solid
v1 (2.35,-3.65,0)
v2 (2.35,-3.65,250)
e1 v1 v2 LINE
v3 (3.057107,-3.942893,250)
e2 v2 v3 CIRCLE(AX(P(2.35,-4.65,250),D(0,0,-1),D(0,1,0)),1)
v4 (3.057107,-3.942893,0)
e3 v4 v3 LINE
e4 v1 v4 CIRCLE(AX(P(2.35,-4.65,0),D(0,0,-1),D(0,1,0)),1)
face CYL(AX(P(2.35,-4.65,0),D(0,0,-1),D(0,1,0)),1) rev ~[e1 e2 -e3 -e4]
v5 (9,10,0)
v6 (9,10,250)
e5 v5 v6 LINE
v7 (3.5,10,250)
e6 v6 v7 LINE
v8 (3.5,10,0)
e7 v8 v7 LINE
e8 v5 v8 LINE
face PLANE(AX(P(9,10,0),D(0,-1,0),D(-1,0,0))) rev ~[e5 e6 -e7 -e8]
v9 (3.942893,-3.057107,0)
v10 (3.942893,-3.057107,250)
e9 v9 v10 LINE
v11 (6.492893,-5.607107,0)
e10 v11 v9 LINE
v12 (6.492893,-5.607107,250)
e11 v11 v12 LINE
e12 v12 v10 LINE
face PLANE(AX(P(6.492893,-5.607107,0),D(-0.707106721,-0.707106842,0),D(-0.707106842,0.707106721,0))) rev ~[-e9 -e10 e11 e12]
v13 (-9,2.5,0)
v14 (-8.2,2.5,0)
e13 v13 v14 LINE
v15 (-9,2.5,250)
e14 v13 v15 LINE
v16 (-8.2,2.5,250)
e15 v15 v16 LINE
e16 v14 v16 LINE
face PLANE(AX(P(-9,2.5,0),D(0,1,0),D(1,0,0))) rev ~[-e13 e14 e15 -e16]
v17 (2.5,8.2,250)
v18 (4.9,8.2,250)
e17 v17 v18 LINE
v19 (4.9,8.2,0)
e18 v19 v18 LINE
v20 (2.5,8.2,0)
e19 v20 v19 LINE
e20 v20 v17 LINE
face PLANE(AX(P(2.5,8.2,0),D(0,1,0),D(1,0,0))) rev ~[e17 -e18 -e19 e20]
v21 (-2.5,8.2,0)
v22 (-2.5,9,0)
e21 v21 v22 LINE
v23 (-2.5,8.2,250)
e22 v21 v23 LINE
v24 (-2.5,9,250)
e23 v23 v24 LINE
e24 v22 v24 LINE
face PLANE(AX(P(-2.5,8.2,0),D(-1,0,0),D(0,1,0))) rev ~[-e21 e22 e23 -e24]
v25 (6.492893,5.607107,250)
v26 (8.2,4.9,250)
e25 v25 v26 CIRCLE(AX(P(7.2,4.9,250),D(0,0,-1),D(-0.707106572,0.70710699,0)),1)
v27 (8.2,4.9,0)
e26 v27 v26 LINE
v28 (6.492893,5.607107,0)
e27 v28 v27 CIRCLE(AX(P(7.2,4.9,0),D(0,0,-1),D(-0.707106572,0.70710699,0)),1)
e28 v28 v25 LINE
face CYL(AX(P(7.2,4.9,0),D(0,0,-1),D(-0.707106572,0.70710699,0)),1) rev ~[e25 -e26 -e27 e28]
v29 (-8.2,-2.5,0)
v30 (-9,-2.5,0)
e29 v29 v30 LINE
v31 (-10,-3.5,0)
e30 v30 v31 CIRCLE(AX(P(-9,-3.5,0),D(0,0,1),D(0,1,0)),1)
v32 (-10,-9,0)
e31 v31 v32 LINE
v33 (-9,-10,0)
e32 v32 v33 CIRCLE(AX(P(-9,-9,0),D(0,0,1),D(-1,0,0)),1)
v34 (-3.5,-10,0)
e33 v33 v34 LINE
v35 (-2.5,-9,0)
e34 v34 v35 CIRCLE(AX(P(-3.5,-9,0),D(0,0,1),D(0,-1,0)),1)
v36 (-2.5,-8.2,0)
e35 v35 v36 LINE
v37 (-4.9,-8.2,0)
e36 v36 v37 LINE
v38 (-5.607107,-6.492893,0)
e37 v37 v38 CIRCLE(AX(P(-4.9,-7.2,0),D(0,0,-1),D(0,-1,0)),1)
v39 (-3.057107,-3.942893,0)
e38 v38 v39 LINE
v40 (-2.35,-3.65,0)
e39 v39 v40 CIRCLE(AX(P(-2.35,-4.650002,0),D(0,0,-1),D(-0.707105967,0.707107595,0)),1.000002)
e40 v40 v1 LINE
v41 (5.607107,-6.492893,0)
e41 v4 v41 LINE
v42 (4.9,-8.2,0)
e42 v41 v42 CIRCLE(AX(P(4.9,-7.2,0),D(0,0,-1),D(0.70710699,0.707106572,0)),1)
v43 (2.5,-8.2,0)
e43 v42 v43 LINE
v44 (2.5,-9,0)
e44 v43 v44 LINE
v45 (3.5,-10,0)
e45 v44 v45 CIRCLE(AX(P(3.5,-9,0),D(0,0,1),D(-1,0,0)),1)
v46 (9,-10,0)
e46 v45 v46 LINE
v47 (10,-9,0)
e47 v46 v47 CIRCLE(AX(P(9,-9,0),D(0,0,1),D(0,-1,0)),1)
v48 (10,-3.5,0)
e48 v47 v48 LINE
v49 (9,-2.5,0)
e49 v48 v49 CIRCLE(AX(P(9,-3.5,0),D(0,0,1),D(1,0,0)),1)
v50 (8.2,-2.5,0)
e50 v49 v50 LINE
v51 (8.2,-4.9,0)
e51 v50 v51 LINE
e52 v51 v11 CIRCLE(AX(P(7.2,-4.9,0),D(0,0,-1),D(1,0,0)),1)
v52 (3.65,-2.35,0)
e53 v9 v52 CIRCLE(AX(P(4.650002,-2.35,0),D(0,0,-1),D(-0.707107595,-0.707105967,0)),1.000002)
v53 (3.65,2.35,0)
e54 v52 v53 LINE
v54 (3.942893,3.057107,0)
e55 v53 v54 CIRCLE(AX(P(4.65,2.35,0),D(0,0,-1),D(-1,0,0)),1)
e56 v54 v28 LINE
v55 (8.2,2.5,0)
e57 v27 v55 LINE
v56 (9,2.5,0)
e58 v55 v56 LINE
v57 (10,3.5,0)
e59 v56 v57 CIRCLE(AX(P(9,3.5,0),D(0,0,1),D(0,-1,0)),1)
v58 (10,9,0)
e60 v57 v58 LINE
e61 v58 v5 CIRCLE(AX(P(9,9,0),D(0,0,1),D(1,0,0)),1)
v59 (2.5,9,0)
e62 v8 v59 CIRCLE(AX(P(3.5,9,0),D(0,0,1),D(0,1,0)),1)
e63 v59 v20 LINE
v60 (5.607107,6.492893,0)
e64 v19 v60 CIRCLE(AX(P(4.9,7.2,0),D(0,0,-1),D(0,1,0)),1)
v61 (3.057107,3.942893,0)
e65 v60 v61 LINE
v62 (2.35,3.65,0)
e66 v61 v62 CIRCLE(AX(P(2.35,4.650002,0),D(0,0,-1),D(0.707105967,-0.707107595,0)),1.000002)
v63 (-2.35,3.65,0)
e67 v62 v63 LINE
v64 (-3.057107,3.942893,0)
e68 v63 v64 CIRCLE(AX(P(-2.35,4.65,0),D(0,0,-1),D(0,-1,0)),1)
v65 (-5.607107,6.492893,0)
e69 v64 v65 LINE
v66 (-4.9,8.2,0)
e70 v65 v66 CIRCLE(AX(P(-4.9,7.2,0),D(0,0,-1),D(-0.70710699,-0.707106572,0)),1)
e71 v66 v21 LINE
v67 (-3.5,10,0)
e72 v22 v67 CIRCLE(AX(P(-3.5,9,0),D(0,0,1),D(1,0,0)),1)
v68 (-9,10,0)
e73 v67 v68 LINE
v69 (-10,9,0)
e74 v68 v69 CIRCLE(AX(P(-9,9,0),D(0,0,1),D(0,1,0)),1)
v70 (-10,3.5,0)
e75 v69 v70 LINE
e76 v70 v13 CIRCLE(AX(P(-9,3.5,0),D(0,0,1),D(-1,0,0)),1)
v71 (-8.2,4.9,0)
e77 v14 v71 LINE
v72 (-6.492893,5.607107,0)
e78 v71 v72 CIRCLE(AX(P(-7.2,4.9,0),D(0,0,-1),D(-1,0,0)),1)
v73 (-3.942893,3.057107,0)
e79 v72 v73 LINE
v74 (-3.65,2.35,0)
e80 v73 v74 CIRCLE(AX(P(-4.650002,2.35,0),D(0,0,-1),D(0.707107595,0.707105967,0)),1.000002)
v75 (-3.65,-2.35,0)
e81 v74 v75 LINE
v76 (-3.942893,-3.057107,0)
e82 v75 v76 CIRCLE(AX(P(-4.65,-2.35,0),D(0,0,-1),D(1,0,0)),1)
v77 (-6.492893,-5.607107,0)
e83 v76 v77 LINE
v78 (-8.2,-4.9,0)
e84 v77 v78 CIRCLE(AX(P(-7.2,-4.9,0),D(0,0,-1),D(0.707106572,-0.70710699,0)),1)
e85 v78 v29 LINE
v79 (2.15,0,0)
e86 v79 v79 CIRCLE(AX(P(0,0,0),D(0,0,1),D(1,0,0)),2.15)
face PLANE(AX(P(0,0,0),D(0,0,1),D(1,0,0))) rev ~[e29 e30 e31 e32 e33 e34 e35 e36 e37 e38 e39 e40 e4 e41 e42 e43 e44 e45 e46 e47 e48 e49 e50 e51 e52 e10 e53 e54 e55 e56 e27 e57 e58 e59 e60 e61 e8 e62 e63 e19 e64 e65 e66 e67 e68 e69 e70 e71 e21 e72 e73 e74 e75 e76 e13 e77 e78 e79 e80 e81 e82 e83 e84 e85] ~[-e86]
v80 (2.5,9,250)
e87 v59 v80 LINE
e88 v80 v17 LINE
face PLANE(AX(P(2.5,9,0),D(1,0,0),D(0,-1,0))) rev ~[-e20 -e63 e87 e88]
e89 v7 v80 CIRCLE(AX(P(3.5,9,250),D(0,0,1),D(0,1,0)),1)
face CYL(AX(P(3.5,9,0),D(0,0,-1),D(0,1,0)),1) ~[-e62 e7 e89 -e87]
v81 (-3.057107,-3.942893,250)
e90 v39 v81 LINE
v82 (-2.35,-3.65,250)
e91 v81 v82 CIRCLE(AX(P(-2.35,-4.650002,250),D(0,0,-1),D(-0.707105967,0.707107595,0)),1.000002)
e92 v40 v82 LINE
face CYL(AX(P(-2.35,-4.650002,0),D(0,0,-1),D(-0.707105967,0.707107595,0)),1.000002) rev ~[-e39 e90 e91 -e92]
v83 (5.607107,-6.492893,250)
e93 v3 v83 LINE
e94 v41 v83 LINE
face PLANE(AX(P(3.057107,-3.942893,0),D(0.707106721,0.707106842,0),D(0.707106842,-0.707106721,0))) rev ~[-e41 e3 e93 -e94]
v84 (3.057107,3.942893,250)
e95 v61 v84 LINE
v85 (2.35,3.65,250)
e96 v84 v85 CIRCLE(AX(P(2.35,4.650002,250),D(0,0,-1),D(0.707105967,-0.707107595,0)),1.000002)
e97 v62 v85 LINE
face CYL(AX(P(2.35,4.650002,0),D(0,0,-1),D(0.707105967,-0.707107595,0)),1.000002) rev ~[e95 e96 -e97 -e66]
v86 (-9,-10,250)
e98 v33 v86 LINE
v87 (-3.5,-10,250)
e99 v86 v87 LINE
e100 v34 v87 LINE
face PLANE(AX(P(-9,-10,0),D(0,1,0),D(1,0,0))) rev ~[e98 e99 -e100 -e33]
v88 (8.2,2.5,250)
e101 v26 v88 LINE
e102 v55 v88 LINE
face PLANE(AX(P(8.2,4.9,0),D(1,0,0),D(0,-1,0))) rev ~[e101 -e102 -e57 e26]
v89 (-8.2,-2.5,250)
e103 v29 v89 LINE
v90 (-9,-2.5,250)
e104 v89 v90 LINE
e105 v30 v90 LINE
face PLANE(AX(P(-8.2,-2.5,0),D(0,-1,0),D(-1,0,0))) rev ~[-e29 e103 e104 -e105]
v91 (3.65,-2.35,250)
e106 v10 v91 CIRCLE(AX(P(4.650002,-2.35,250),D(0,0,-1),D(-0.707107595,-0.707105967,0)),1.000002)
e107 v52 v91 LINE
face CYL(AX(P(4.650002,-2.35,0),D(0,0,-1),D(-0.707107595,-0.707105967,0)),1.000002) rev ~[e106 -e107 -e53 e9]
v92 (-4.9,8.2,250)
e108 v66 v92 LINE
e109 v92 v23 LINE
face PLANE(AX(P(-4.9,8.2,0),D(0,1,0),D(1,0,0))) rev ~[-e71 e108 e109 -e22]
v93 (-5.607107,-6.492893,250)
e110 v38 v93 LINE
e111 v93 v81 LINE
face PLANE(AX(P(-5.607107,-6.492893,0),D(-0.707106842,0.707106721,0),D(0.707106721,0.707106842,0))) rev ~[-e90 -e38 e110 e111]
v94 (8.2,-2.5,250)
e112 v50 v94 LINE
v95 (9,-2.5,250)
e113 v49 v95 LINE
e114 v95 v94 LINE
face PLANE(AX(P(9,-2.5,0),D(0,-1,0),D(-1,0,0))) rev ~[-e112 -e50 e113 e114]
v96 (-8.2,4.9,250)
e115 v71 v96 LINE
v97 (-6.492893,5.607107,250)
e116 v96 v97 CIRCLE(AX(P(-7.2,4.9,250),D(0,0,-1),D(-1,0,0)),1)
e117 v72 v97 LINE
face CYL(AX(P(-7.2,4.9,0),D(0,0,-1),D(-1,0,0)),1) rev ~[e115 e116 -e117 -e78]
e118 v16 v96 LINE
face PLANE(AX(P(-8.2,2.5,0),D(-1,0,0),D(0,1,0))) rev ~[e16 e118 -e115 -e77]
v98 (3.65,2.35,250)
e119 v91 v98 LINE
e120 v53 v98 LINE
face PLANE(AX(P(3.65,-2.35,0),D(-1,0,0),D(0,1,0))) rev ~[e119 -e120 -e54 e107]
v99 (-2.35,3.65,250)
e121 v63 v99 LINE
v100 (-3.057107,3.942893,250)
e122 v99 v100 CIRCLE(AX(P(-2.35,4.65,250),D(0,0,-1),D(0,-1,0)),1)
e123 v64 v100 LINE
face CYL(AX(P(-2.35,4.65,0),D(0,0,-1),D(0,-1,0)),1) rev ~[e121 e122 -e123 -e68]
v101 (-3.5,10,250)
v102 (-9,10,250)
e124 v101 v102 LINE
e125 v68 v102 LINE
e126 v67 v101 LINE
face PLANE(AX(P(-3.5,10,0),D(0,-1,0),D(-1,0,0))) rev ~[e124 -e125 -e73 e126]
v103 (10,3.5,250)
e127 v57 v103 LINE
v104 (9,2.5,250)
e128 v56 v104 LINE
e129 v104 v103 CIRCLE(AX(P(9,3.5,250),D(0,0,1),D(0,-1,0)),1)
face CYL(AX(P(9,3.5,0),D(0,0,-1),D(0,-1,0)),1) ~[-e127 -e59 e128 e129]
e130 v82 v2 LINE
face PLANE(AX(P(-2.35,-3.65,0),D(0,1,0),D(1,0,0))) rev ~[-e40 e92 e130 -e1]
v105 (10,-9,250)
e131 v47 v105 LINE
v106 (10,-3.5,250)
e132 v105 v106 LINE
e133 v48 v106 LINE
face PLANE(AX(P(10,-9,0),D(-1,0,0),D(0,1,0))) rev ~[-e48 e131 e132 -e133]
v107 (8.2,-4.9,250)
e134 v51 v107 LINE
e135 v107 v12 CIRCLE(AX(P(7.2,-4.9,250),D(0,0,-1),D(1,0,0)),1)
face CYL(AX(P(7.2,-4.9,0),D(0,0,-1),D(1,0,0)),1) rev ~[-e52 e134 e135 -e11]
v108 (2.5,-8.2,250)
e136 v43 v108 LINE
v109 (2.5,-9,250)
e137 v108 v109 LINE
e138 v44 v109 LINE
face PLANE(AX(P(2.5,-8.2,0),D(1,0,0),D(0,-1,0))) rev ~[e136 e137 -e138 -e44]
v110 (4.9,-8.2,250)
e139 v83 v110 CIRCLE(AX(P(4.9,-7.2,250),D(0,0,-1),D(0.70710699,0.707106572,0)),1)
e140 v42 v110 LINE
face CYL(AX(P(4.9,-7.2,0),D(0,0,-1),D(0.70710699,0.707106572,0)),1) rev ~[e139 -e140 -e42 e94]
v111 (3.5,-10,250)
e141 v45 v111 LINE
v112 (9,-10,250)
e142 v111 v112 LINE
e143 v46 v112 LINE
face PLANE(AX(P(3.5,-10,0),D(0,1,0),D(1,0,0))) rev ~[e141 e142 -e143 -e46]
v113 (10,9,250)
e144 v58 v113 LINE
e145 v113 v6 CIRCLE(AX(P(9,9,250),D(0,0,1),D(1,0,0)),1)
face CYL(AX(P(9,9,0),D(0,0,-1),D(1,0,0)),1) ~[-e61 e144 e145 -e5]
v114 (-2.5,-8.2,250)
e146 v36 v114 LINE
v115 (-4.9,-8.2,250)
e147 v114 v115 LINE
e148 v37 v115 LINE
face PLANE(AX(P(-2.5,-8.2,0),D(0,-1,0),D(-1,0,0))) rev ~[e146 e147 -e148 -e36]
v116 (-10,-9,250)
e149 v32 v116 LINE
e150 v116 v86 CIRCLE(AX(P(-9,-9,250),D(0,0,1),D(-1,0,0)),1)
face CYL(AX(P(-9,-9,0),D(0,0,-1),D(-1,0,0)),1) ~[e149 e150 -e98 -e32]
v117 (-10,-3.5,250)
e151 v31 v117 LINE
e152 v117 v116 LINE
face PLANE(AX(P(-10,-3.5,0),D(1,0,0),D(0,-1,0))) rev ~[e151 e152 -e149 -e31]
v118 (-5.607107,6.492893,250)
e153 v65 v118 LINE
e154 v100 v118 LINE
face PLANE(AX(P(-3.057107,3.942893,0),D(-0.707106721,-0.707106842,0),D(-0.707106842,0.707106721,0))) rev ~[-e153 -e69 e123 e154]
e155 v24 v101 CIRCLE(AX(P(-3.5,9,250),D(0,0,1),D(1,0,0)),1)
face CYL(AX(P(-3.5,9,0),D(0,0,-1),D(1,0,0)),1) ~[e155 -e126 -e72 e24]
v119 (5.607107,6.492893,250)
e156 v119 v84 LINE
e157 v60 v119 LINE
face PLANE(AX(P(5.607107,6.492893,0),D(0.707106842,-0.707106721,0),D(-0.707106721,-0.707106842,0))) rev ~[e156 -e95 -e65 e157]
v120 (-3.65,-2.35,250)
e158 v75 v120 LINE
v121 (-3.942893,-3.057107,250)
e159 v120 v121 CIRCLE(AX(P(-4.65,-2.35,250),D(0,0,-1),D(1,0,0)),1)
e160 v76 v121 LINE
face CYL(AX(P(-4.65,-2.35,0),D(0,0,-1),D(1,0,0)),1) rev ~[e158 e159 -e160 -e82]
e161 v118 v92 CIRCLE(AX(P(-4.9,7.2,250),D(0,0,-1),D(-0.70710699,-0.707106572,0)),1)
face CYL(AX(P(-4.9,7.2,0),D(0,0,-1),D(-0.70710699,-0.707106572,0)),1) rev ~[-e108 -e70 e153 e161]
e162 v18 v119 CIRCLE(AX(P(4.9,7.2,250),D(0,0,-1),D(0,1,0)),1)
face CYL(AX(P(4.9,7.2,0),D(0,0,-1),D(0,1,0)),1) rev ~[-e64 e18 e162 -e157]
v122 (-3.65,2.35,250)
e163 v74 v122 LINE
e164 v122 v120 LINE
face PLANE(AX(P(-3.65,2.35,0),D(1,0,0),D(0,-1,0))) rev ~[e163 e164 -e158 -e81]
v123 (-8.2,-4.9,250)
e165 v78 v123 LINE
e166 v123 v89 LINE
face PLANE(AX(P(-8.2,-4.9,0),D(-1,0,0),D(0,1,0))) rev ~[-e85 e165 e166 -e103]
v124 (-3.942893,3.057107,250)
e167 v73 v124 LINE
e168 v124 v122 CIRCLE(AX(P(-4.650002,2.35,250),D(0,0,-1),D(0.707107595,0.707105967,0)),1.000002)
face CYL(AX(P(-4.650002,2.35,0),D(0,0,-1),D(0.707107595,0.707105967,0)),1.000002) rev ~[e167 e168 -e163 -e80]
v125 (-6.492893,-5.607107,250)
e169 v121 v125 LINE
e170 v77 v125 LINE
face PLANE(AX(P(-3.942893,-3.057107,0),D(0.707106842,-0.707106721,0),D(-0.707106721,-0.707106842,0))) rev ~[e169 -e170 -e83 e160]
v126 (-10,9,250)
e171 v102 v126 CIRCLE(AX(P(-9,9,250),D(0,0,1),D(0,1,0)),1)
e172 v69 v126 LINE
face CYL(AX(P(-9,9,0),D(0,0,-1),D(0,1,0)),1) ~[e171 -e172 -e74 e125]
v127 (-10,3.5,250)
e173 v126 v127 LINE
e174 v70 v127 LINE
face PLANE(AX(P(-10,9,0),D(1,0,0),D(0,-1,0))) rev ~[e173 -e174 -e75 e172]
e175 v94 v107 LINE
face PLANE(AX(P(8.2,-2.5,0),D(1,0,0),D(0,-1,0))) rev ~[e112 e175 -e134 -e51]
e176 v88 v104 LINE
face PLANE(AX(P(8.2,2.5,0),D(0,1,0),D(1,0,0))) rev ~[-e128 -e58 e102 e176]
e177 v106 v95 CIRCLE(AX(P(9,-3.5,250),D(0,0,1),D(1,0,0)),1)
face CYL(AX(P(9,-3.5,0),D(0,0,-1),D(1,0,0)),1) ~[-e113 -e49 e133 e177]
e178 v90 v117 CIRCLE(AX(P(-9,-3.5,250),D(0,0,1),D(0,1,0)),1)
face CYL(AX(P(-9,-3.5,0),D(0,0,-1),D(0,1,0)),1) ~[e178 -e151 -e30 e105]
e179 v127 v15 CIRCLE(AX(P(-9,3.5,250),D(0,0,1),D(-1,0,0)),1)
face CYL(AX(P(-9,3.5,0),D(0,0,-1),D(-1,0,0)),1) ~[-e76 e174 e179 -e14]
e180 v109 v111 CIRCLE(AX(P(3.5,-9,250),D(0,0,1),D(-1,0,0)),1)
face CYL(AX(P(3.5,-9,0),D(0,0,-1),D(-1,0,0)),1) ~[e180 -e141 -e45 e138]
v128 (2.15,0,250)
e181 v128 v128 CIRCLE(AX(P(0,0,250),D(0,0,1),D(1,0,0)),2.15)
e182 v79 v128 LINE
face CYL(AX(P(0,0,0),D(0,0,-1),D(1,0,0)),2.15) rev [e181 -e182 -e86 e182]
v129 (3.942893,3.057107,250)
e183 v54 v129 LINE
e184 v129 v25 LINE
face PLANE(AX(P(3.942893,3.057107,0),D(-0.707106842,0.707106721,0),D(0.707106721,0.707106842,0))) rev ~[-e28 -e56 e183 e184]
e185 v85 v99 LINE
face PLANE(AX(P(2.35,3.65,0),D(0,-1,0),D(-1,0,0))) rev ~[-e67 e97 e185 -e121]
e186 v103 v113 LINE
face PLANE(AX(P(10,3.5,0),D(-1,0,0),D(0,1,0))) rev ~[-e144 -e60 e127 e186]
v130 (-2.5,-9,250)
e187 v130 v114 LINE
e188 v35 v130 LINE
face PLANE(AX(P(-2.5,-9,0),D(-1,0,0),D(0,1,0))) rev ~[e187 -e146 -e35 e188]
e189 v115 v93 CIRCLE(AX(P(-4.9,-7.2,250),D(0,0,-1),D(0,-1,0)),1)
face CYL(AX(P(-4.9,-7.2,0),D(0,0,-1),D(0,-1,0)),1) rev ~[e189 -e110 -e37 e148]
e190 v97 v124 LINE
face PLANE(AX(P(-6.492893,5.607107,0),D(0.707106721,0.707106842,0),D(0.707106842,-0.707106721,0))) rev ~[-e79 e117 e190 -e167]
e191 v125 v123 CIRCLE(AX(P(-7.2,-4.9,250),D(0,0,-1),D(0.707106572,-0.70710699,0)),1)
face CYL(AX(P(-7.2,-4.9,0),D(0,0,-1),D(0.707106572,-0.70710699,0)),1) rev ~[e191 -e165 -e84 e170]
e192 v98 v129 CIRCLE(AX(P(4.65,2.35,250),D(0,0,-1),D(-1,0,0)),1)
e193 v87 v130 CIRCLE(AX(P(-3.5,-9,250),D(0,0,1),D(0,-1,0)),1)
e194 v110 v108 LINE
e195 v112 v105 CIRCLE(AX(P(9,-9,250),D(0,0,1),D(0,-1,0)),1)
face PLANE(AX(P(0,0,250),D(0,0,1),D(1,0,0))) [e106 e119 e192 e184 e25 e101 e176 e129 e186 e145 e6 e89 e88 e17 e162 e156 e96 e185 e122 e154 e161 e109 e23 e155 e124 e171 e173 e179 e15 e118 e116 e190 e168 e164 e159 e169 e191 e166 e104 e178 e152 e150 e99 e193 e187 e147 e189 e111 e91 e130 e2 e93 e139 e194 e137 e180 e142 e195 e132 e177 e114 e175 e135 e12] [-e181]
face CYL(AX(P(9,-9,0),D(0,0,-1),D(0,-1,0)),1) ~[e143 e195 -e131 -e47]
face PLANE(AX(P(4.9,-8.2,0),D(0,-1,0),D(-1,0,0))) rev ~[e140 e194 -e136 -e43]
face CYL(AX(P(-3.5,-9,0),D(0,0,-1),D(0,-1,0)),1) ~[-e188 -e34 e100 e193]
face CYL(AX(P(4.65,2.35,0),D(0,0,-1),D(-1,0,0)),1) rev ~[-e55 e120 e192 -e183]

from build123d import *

# Parameters (mm, degrees)
F0_R     = 2.15
F1_DEPTH = 250


# Not quite as in the source:
# - ends of sketch curves that miss each other by under 0.0002 mm in the source are joined


with BuildPart() as f1:
    # F0 (on Top) → F1 (new body)
    with BuildSketch(Plane.XY):
        with BuildLine():
            Line((10, 3.5), (10, 9))
            ThreePointArc((10, 9), (9.7071067812, 9.7071067812), (9, 10))
            Line((9, 10), (3.5, 10))
            ThreePointArc((3.5, 10), (2.7928932188, 9.7071067812), (2.5, 9))
            Line((2.5, 9), (2.5, 8.2))
            Line((2.5, 8.2), (4.9, 8.2))
            ThreePointArc((4.9, 8.2), (5.8238795325, 7.5826834324), (5.6071067812, 6.4928932188))
            Line((5.6071067812, 6.4928932188), (3.057107, 3.942893))
            ThreePointArc((3.057107, 3.942893), (2.7326834324, 3.7261204675), (2.35, 3.65))
            Line((2.35, 3.65), (-2.35, 3.65))
            ThreePointArc((-2.35, 3.65), (-2.7326834324, 3.7261204675), (-3.0571067812, 3.9428932188))
            Line((-3.0571067812, 3.9428932188), (-5.607107, 6.492893))
            ThreePointArc((-5.607107, 6.492893), (-5.8238795325, 7.5826834324), (-4.9, 8.2))
            Line((-4.9, 8.2), (-2.5, 8.2))
            Line((-2.5, 8.2), (-2.5, 9))
            ThreePointArc((-2.5, 9), (-2.7928932188, 9.7071067812), (-3.5, 10))
            Line((-3.5, 10), (-9, 10))
            ThreePointArc((-9, 10), (-9.7071067812, 9.7071067812), (-10, 9))
            Line((-10, 9), (-10, 3.5))
            ThreePointArc((-10, 3.5), (-9.7071067812, 2.7928932188), (-9, 2.5))
            Line((-9, 2.5), (-8.2, 2.5))
            Line((-8.2, 2.5), (-8.2, 4.9))
            ThreePointArc((-8.2, 4.9), (-7.5826834324, 5.8238795325), (-6.4928932188, 5.6071067812))
            Line((-6.4928932188, 5.6071067812), (-3.942893, 3.057107))
            ThreePointArc((-3.942893, 3.057107), (-3.7261204675, 2.7326834324), (-3.65, 2.35))
            Line((-3.65, 2.35), (-3.65, -2.35))
            ThreePointArc((-3.65, -2.35), (-3.7261204675, -2.7326834324), (-3.9428932188, -3.0571067812))
            Line((-3.9428932188, -3.0571067812), (-6.492893, -5.607107))
            ThreePointArc((-6.492893, -5.607107), (-7.5826834324, -5.8238795325), (-8.2, -4.9))
            Line((-8.2, -4.9), (-8.2, -2.5))
            Line((-8.2, -2.5), (-9, -2.5))
            ThreePointArc((-9, -2.5), (-9.7071067812, -2.7928932188), (-10, -3.5))
            Line((-10, -3.5), (-10, -9))
            ThreePointArc((-10, -9), (-9.7071067812, -9.7071067812), (-9, -10))
            Line((-9, -10), (-3.5, -10))
            ThreePointArc((-3.5, -10), (-2.7928932188, -9.7071067812), (-2.5, -9))
            Line((-2.5, -9), (-2.5, -8.2))
            Line((-2.5, -8.2), (-4.9, -8.2))
            ThreePointArc((-4.9, -8.2), (-5.8238795325, -7.5826834324), (-5.6071067812, -6.4928932188))
            Line((-5.6071067812, -6.4928932188), (-3.057107, -3.942893))
            ThreePointArc((-3.057107, -3.942893), (-2.7326834324, -3.7261204675), (-2.35, -3.65))
            Line((-2.35, -3.65), (2.35, -3.65))
            ThreePointArc((2.35, -3.65), (2.7326834324, -3.7261204675), (3.0571067812, -3.9428932188))
            Line((3.0571067812, -3.9428932188), (5.607107, -6.492893))
            ThreePointArc((5.607107, -6.492893), (5.8238795325, -7.5826834324), (4.9, -8.2))
            Line((4.9, -8.2), (2.5, -8.2))
            Line((2.5, -8.2), (2.5, -9))
            ThreePointArc((2.5, -9), (2.7928932188, -9.7071067812), (3.5, -10))
            Line((3.5, -10), (9, -10))
            ThreePointArc((9, -10), (9.7071067812, -9.7071067812), (10, -9))
            Line((10, -9), (10, -3.5))
            ThreePointArc((10, -3.5), (9.7071067812, -2.7928932188), (9, -2.5))
            Line((9, -2.5), (8.2, -2.5))
            Line((8.2, -2.5), (8.2, -4.9))
            ThreePointArc((8.2, -4.9), (7.5826834324, -5.8238795325), (6.4928932188, -5.6071067812))
            Line((6.4928932188, -5.6071067812), (3.942893, -3.057107))
            ThreePointArc((3.942893, -3.057107), (3.7261204675, -2.7326834324), (3.65, -2.35))
            Line((3.65, -2.35), (3.65, 2.35))
            ThreePointArc((3.65, 2.35), (3.7261204675, 2.7326834324), (3.9428932188, 3.0571067812))
            Line((3.9428932188, 3.0571067812), (6.492893, 5.607107))
            ThreePointArc((6.492893, 5.607107), (7.5826834324, 5.8238795325), (8.2, 4.9))
            Line((8.2, 4.9), (8.2, 2.5))
            Line((8.2, 2.5), (9, 2.5))
            ThreePointArc((9, 2.5), (9.7071067812, 2.7928932188), (10, 3.5))
        make_face()
        Circle(F0_R, mode=Mode.SUBTRACT)
    extrude(amount=F1_DEPTH)


solid = f1.part
